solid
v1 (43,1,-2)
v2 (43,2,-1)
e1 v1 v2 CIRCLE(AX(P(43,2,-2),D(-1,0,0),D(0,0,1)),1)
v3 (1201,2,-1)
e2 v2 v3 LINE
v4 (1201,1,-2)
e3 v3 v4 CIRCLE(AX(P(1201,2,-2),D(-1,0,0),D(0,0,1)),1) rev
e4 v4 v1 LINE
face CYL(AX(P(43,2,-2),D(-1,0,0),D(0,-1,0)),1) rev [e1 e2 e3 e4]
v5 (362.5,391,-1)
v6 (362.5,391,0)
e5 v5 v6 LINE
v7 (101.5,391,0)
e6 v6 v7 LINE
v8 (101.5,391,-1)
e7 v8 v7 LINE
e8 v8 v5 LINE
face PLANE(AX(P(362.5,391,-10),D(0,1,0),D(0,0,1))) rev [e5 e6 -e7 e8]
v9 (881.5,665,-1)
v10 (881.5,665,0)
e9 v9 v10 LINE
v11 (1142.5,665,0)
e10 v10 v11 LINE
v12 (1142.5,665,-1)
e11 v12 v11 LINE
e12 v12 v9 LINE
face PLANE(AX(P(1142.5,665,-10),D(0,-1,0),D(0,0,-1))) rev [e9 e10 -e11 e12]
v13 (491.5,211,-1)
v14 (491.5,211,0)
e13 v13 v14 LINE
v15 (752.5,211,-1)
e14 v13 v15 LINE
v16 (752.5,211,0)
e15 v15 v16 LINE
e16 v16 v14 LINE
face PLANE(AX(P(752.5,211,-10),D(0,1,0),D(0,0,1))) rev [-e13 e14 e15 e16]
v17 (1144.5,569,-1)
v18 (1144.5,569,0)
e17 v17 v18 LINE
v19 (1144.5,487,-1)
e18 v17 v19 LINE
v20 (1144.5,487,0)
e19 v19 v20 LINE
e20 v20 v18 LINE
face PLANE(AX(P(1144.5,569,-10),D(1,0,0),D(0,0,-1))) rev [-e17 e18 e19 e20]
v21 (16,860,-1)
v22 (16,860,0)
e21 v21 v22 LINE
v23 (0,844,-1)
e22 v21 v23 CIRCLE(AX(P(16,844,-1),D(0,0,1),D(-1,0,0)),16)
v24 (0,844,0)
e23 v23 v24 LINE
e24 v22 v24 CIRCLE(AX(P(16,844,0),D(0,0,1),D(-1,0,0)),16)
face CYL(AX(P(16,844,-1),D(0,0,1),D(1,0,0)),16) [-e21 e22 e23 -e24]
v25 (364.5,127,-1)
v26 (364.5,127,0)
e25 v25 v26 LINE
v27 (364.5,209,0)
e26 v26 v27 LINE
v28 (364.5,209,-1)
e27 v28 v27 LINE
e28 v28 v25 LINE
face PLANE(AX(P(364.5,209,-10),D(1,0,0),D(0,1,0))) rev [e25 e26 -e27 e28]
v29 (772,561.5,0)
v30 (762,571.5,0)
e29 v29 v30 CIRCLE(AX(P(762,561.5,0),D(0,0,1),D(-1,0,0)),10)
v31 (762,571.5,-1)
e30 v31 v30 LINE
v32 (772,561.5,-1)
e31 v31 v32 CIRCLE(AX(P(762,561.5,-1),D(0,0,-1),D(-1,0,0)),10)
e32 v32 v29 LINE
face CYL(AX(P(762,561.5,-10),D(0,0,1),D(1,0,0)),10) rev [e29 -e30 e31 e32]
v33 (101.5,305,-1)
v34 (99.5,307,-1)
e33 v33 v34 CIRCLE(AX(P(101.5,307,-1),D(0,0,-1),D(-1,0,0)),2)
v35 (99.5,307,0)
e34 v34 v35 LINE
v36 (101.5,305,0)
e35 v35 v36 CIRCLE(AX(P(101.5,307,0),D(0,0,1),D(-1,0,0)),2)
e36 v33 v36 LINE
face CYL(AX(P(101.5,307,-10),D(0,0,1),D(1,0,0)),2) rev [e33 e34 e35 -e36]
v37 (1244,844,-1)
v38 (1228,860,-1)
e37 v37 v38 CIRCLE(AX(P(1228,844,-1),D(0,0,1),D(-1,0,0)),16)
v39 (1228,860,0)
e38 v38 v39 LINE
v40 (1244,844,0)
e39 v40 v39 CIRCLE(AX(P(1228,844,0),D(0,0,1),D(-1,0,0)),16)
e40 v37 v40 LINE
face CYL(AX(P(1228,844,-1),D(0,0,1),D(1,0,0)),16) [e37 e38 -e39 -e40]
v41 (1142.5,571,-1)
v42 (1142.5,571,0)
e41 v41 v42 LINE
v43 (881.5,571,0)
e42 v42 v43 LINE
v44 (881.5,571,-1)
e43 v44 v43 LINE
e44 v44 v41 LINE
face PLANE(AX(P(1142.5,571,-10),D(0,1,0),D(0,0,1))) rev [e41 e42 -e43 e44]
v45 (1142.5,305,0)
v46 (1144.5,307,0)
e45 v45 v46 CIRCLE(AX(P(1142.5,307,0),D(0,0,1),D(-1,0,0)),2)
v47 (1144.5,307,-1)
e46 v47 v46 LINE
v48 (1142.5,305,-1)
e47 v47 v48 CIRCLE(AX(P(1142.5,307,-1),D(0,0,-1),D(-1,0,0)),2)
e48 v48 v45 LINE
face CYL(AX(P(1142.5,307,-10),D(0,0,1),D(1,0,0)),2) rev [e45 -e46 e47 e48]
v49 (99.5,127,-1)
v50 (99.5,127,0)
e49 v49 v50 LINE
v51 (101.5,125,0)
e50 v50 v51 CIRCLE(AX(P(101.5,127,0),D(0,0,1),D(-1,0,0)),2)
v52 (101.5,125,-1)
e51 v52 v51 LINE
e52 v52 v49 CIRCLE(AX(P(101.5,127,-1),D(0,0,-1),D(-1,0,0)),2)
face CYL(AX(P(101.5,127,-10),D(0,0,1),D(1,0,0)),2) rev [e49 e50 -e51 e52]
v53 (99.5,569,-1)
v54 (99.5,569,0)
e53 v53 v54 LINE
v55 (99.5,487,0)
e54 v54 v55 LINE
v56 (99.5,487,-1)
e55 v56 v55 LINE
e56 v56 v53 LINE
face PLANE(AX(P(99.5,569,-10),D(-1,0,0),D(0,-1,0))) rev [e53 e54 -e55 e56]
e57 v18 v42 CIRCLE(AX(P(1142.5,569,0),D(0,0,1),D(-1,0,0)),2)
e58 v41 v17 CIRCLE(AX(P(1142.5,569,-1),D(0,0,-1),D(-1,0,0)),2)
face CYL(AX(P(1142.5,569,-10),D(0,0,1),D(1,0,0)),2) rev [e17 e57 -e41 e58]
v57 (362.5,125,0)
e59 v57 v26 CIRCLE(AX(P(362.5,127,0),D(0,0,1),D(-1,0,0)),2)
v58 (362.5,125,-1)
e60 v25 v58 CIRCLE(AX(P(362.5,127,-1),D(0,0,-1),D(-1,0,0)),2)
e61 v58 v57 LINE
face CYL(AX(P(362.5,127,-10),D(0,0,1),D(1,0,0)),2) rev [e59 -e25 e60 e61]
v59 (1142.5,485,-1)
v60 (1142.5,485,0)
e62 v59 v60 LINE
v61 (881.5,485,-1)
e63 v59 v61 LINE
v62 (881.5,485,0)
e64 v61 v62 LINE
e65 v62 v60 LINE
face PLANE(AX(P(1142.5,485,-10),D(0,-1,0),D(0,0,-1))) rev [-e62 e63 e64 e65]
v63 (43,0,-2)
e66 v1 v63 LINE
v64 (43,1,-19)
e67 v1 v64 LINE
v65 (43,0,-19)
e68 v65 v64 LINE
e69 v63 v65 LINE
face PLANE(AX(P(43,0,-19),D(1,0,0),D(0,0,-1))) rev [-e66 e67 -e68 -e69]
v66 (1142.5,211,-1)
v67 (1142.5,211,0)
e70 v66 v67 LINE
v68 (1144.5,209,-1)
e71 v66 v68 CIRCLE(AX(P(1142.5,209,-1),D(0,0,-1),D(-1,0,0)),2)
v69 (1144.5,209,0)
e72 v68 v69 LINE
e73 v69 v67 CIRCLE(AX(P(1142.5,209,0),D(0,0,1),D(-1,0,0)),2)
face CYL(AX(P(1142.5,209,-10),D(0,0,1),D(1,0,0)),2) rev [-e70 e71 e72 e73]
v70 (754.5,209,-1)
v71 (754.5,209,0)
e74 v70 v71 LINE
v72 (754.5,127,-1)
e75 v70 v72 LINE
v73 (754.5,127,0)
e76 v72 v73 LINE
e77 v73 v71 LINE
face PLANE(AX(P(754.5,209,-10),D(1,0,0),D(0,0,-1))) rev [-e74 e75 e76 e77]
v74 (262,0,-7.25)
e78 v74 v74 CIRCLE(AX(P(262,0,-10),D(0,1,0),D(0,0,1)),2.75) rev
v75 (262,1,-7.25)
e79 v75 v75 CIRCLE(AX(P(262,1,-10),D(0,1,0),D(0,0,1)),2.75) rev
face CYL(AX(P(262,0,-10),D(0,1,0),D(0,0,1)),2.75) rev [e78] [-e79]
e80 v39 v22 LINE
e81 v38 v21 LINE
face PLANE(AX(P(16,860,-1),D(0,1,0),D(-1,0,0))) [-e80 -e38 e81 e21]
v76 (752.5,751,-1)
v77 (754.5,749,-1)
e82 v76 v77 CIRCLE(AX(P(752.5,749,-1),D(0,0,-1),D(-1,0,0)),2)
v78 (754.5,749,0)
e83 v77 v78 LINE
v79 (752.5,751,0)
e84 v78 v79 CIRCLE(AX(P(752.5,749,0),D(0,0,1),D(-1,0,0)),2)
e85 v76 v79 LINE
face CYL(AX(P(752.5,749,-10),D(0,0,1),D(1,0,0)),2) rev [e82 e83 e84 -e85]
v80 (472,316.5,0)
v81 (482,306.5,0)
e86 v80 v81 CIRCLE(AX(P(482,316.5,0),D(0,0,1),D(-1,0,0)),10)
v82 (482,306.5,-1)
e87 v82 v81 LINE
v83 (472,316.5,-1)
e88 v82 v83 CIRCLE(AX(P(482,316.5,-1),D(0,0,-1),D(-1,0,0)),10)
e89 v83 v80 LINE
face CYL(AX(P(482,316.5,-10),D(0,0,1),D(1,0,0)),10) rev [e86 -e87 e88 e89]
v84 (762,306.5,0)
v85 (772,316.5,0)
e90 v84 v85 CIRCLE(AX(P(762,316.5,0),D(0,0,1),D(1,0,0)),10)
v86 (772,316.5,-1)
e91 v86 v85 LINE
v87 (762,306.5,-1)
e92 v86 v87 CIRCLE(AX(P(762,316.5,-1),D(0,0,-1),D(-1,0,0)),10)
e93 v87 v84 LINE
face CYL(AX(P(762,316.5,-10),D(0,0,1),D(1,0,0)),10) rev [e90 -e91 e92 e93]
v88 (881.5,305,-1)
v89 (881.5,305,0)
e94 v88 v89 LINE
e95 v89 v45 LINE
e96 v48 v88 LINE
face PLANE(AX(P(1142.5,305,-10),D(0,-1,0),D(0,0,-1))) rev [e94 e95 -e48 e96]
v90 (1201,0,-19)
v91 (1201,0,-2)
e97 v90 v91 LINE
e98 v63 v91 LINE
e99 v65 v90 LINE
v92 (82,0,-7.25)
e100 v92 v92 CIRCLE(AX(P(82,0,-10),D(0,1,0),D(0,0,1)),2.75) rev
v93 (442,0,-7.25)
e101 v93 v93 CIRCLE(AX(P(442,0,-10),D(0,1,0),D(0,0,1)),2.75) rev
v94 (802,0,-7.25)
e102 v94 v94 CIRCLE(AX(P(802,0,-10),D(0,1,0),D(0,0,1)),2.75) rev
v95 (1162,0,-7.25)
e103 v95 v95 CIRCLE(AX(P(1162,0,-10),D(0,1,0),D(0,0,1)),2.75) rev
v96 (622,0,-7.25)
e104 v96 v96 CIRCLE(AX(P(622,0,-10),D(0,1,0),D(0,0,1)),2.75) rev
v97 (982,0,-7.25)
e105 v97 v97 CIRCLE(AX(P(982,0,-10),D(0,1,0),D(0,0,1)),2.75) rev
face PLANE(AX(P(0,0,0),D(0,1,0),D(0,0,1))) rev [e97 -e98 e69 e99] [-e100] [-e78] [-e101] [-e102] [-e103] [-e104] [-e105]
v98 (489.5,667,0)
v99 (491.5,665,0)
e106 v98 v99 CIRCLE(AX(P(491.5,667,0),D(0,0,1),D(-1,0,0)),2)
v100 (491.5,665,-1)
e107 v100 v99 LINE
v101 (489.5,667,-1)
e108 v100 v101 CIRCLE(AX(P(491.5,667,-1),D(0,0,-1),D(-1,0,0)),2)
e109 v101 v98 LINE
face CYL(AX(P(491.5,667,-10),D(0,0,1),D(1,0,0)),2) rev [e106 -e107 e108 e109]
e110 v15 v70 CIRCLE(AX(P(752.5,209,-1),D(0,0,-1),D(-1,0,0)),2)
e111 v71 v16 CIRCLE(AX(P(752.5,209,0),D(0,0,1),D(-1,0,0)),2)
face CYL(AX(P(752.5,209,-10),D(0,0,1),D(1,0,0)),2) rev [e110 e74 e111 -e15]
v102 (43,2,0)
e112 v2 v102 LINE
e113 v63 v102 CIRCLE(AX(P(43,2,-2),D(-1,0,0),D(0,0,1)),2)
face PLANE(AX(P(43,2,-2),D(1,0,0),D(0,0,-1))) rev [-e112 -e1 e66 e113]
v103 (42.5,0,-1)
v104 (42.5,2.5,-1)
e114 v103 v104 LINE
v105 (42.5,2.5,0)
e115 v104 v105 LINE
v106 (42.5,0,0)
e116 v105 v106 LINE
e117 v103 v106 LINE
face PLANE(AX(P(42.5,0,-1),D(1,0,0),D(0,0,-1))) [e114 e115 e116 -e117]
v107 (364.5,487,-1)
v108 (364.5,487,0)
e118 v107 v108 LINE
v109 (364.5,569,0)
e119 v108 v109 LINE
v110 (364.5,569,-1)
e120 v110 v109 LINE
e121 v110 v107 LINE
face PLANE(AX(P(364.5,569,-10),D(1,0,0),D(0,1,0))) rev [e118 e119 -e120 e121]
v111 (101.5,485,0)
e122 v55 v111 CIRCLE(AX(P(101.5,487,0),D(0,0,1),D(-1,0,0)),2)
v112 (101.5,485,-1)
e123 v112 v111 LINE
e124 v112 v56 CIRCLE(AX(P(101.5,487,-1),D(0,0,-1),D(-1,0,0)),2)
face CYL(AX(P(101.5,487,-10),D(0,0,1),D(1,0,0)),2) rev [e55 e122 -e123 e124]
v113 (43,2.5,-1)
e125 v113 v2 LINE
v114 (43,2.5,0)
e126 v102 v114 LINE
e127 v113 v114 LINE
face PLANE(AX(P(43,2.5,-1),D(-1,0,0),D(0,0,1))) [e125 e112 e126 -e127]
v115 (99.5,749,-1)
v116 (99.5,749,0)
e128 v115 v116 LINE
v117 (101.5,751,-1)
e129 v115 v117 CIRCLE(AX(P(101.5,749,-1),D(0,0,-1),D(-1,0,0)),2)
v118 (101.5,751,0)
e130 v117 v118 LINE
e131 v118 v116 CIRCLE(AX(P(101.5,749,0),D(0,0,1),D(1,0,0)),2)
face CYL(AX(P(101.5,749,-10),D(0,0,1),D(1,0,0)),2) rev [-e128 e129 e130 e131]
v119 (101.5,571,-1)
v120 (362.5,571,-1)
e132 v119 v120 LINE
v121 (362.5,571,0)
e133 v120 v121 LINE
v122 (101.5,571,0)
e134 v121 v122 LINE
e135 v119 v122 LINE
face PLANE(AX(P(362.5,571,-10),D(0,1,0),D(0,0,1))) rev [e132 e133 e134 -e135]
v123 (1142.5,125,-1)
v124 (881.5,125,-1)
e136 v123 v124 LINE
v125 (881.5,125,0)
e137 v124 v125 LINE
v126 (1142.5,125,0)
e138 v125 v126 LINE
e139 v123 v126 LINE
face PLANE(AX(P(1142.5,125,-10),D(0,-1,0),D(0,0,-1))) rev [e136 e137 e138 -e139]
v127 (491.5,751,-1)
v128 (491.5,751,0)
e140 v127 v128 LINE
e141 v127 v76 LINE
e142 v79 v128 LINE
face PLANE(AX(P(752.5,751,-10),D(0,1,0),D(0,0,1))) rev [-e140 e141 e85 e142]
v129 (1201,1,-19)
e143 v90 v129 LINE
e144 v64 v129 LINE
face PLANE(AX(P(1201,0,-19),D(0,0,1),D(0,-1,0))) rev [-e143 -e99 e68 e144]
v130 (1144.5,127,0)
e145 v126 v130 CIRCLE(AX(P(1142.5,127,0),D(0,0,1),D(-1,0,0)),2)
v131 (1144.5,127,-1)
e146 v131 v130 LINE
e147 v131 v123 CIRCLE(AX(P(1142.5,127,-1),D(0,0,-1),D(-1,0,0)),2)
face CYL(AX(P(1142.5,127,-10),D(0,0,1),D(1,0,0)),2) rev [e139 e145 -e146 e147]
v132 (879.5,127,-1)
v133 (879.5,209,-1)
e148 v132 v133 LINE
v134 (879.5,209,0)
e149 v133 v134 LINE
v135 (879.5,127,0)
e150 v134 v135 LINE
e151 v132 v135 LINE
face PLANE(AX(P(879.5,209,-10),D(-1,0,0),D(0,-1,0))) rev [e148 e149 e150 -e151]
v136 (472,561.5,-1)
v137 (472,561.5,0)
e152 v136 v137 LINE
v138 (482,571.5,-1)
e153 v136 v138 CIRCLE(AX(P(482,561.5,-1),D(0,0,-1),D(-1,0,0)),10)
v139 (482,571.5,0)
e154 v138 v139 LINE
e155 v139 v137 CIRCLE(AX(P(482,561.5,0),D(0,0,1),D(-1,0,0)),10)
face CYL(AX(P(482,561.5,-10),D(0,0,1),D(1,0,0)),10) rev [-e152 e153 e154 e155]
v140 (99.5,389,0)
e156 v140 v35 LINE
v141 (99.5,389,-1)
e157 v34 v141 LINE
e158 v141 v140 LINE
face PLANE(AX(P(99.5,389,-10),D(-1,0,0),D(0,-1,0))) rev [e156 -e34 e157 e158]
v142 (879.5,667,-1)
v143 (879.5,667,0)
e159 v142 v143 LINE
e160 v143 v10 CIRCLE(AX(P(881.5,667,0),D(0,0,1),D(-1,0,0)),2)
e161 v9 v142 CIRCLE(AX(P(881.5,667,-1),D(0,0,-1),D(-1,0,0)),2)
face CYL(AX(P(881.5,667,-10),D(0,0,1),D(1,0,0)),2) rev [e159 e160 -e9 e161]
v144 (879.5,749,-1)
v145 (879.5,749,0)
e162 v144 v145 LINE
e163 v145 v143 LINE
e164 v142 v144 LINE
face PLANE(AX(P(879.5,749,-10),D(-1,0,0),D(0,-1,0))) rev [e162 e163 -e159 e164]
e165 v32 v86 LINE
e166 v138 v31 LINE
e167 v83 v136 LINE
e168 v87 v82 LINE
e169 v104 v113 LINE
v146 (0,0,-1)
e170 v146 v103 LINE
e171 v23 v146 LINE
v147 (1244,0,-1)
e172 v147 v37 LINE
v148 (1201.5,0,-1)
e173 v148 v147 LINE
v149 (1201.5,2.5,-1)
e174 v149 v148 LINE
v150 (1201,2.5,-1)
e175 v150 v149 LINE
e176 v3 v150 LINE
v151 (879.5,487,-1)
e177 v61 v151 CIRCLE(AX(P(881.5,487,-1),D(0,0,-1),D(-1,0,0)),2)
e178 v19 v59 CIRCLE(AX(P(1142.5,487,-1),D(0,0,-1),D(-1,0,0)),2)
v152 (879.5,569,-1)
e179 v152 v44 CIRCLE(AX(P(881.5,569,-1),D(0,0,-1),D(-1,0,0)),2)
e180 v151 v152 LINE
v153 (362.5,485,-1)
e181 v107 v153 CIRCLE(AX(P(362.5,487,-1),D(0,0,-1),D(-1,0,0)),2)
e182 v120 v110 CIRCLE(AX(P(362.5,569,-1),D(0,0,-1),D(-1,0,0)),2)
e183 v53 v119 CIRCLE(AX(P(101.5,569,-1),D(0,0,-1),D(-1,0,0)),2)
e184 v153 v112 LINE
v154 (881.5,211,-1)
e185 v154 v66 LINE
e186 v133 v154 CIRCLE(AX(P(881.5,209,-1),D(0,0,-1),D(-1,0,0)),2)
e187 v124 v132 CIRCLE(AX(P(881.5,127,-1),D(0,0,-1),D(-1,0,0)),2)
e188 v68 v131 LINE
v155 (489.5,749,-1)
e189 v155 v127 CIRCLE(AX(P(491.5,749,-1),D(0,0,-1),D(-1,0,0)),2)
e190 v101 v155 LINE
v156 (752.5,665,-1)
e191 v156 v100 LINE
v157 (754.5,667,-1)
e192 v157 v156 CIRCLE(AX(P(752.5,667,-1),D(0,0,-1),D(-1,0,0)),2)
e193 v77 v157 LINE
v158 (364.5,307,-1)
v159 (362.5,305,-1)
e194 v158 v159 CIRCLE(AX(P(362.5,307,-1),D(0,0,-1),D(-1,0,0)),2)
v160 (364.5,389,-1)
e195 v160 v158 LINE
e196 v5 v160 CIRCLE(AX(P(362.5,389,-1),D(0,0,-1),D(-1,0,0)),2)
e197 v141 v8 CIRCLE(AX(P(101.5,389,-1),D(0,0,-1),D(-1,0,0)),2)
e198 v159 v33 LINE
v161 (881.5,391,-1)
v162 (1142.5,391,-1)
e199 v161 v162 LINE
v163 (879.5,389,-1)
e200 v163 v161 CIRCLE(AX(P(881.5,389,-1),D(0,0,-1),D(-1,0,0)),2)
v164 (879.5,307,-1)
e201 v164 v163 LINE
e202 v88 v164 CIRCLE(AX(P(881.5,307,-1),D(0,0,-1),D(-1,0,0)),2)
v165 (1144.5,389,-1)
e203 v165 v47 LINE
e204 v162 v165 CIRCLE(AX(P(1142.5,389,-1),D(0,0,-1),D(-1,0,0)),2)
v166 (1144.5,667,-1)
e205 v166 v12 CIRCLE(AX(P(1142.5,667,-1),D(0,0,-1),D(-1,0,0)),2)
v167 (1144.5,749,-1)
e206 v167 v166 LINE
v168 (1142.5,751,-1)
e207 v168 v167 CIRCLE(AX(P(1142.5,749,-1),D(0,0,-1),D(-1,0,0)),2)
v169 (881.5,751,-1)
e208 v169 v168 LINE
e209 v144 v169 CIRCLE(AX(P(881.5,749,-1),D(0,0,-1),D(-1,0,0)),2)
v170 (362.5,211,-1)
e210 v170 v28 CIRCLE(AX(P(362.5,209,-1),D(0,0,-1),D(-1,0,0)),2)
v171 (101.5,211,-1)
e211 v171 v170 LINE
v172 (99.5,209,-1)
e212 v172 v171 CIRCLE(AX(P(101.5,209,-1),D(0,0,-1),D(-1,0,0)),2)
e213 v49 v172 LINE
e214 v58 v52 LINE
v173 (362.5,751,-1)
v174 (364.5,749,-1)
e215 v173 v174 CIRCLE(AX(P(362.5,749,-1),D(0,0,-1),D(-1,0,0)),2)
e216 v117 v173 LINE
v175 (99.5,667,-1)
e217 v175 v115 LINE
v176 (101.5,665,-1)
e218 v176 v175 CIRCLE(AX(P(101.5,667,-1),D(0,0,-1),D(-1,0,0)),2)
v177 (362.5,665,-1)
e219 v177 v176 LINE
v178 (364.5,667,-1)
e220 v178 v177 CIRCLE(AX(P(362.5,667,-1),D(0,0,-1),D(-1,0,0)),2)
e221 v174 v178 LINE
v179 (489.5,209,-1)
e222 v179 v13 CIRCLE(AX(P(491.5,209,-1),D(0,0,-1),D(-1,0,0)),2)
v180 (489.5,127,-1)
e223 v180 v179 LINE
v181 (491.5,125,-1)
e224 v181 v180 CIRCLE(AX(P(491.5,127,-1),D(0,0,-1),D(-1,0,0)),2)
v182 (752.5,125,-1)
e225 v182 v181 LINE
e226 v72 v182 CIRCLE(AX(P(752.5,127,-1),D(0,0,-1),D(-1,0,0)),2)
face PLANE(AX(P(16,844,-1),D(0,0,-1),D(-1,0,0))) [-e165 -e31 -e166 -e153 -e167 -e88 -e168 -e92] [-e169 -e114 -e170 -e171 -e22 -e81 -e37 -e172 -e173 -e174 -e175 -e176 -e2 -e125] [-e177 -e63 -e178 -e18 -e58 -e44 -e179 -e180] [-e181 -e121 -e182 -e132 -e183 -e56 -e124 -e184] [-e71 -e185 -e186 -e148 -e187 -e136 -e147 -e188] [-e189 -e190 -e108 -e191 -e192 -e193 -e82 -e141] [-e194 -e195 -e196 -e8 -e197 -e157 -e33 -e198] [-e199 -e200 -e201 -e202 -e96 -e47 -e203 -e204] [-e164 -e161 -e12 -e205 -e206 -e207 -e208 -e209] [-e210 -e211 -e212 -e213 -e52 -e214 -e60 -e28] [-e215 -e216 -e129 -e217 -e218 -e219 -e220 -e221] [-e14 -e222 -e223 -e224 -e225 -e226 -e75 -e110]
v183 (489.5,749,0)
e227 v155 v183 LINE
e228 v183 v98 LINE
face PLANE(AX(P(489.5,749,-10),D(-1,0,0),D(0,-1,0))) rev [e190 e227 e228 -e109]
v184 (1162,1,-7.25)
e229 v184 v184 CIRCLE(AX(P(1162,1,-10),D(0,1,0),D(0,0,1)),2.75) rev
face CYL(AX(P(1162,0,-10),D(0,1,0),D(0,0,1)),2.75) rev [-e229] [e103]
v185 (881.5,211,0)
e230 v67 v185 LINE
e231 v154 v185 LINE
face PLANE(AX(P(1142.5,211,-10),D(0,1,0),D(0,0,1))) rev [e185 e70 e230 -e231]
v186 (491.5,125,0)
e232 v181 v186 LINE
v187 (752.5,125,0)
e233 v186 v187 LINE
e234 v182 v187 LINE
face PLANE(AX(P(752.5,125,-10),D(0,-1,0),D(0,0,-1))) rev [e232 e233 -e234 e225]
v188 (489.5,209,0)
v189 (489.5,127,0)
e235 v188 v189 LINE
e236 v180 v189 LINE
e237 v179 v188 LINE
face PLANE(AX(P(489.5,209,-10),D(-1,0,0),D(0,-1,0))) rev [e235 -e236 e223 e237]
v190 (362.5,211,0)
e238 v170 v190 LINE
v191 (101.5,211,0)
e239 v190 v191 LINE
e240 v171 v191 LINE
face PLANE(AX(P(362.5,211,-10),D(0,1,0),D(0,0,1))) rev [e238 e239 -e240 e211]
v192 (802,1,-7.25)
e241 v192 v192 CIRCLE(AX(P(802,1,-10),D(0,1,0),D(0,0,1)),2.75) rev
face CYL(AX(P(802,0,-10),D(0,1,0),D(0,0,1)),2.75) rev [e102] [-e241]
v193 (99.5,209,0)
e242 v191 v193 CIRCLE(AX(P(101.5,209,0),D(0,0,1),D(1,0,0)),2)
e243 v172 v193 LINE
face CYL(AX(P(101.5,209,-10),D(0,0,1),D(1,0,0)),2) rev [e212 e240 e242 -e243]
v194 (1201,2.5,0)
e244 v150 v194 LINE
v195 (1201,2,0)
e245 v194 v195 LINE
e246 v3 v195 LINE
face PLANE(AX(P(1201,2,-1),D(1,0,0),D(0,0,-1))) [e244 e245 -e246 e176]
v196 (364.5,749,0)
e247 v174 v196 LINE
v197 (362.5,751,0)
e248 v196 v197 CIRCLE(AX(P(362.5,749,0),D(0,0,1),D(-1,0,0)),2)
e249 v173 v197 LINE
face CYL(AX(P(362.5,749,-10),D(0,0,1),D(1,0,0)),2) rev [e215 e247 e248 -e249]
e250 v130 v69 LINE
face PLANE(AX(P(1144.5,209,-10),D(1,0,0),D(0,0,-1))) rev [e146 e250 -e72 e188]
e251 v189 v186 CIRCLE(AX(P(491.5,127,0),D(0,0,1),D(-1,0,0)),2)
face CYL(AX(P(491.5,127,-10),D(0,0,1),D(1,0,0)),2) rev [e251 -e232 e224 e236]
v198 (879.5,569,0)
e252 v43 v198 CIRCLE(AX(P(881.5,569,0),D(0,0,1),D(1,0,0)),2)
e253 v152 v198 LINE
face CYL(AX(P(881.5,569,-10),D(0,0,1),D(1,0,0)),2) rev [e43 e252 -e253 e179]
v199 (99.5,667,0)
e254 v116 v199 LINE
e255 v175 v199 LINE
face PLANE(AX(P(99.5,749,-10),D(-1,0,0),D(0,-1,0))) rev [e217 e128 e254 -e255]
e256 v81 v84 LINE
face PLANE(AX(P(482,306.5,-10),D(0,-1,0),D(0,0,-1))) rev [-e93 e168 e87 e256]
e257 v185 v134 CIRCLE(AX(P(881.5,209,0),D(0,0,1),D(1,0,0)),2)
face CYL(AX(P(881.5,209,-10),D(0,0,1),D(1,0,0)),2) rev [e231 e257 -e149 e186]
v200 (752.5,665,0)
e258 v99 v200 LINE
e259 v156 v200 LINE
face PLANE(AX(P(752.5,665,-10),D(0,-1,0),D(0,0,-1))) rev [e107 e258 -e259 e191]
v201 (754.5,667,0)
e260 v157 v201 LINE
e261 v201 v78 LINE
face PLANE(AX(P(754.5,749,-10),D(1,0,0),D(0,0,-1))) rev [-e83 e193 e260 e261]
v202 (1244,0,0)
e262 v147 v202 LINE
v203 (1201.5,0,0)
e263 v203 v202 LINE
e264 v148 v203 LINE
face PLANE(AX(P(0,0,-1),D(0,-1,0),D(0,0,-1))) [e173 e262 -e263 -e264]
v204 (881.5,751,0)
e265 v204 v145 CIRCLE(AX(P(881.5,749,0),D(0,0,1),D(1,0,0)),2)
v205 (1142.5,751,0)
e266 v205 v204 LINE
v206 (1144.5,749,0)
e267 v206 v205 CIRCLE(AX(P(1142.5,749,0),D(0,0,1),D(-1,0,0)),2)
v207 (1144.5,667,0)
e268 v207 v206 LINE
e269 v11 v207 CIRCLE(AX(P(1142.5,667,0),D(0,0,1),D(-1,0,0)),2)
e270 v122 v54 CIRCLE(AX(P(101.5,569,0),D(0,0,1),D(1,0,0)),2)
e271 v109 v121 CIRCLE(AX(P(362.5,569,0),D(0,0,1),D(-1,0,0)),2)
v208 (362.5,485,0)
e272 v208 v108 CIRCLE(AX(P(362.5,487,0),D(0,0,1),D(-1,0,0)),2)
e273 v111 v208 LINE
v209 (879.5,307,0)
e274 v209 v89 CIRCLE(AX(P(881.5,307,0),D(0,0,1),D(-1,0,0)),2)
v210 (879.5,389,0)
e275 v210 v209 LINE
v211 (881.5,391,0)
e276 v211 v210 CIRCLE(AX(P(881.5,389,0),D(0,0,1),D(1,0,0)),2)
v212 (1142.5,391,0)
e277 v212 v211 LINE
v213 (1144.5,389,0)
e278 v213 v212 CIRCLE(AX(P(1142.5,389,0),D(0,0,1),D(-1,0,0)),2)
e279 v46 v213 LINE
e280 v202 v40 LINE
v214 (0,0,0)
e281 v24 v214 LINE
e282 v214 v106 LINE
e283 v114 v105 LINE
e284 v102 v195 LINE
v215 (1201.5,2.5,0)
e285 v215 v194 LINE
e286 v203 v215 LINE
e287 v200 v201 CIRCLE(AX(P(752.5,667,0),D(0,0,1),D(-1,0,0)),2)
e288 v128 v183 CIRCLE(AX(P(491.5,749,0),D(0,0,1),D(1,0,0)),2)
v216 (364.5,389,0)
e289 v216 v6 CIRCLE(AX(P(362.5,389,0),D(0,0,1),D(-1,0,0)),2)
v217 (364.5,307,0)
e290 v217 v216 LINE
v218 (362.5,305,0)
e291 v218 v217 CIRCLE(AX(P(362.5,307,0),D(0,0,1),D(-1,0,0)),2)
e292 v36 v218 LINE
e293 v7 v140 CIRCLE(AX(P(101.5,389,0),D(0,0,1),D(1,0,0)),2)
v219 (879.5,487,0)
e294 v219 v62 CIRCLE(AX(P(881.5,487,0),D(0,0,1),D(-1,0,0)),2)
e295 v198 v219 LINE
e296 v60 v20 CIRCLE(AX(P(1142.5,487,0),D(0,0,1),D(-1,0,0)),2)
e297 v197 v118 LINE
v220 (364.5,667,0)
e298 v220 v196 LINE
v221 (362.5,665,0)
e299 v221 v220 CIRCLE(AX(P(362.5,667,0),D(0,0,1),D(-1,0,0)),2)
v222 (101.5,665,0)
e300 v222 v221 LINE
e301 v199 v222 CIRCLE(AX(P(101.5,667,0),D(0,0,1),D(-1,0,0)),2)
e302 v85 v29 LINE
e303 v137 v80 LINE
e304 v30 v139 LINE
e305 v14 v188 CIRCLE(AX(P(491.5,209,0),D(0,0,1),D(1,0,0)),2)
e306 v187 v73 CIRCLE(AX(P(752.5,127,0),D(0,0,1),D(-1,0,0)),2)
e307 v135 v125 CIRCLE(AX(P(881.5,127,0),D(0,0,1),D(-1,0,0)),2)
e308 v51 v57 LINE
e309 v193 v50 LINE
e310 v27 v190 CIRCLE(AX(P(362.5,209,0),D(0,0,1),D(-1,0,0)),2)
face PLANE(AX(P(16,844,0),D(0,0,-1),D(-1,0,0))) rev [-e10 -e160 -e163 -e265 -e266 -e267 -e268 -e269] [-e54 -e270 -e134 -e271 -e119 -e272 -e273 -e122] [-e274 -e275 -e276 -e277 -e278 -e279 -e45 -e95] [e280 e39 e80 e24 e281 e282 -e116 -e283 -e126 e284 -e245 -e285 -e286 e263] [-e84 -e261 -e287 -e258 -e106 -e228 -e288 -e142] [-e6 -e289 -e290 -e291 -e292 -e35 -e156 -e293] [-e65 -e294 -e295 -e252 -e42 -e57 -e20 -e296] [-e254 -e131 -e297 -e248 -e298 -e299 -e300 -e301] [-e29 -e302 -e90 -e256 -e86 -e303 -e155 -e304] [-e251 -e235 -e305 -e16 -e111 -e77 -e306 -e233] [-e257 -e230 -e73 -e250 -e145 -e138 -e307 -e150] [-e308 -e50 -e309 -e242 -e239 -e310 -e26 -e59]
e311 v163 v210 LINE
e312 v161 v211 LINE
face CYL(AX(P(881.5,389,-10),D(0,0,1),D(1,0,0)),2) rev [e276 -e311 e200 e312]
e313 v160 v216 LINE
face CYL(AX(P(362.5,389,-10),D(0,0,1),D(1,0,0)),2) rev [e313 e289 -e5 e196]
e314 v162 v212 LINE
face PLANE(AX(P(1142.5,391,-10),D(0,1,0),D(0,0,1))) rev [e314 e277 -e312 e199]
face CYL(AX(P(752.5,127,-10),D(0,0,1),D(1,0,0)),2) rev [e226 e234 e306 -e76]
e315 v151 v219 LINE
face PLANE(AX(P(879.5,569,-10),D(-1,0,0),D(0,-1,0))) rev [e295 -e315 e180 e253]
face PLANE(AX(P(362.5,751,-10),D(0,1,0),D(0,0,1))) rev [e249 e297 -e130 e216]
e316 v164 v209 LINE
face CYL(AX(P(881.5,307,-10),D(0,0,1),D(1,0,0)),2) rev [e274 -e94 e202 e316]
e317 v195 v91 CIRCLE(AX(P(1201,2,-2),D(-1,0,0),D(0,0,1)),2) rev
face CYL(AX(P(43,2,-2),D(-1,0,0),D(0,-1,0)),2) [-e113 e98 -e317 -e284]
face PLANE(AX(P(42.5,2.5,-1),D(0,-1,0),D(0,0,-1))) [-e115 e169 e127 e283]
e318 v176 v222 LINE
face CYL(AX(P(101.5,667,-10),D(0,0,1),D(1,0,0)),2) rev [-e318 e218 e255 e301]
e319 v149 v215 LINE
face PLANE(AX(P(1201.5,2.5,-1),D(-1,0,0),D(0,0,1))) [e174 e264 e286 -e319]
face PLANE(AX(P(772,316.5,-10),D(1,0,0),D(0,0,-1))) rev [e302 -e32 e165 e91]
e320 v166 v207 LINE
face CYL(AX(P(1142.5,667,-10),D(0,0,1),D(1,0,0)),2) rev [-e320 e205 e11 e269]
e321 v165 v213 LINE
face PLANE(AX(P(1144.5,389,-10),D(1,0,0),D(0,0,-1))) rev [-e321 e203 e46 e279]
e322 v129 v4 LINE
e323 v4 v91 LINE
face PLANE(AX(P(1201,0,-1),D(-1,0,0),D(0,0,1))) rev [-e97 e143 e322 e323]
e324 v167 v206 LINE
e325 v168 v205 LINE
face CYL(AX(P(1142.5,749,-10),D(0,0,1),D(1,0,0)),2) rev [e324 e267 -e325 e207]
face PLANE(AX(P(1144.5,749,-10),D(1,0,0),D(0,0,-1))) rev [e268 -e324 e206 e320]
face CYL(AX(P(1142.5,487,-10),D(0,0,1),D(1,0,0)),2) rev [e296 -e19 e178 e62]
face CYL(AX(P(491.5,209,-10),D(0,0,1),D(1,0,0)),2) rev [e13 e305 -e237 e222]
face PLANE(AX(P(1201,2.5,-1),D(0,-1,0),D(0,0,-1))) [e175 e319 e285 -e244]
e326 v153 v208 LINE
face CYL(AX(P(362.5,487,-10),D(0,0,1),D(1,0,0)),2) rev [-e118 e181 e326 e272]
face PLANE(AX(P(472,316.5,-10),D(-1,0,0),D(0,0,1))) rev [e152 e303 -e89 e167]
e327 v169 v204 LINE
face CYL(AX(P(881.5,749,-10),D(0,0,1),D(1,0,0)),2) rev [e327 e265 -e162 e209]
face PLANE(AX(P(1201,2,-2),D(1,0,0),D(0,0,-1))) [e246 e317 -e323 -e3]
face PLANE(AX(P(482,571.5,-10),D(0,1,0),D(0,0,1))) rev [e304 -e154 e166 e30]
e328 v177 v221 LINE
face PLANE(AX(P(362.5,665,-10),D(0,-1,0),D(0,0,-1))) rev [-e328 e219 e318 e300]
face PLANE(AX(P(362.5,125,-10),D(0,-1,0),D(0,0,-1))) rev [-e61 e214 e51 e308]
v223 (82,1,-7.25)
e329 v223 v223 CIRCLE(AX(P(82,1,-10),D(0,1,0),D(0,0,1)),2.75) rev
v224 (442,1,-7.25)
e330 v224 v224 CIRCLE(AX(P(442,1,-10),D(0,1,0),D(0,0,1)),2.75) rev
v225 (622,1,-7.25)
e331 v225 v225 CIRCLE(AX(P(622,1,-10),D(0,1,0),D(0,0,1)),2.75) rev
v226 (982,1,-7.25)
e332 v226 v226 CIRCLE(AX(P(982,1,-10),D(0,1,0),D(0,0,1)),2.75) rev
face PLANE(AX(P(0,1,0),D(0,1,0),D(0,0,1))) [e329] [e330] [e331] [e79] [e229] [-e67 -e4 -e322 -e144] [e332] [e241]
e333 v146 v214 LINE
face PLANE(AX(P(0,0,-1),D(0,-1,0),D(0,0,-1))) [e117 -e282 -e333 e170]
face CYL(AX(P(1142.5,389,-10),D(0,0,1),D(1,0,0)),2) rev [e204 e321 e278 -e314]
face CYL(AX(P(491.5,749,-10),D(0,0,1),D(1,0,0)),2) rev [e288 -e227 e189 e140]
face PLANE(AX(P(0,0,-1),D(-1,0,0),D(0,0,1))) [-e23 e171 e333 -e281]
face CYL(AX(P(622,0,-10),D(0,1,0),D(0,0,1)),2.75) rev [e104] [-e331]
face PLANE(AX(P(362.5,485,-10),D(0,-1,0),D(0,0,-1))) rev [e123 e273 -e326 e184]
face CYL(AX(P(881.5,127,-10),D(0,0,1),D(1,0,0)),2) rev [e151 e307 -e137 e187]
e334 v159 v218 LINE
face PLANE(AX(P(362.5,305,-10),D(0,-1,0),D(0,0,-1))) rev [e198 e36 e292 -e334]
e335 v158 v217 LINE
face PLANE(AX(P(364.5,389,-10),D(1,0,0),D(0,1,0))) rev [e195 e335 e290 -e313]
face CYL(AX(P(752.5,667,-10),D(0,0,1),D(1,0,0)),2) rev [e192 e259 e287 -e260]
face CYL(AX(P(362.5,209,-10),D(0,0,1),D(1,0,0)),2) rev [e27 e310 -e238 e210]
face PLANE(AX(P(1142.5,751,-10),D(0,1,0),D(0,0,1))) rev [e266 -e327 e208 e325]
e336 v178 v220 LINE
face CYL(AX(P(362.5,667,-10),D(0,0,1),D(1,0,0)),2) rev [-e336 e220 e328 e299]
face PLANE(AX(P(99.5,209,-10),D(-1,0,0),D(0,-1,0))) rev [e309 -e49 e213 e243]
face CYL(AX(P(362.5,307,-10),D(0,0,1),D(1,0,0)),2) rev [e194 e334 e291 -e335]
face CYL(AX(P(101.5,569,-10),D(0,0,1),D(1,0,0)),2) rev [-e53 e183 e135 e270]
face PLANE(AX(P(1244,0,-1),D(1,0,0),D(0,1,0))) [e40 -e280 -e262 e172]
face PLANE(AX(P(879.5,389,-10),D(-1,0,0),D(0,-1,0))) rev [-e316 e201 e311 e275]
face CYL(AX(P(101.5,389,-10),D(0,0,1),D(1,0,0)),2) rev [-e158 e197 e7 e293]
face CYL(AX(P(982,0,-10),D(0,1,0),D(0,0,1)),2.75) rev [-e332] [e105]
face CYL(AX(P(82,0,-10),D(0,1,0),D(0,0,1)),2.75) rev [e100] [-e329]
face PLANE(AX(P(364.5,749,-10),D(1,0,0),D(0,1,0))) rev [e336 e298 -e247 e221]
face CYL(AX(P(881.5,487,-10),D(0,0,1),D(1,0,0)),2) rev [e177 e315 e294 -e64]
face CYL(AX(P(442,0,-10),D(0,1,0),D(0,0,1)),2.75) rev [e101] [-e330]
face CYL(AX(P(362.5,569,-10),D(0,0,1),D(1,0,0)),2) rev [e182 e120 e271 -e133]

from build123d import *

# Parameters (mm, degrees)
BASE_FLANGE1_DEPTH            = 1
EDGE_FLANGE1_STRIP_W          = 6
EDGE_FLANGE1_STRIP_H          = 1
EDGE_FLANGE1_STRIP_CUT_DEPTH  = 1158
EDGE_FLANGE1_RELIEF_W         = 6.5
EDGE_FLANGE1_RELIEF_H         = 0.5
EDGE_FLANGE1_RELIEF_CUT_DEPTH = 1
EDGE_FLANGE1_DEPTH            = 1158
EDGE_FLANGE1_PROFILE_W        = 1158
EDGE_FLANGE1_PROFILE_H        = 17
EDGE_FLANGE1_PROFILE_R        = 2.75
EDGE_FLANGE1_FLAT_DEPTH       = 1
CUT_EXTRUDE1_DEPTH            = 10
CUT_EXTRUDE2_DEPTH            = 10


# Sheet-metal steps are written as plain solids
with BuildPart() as part:
    # Sketch1 → Base-Flange1 (new body)
    with BuildSketch(Plane.XY):
        with BuildLine():
            Line((0, 0), (1244, 0))
            Line((1244, 0), (1244, 844))
            ThreePointArc((1244, 844), (1239.313708499, 855.313708499), (1228, 860))
            Line((1228, 860), (16, 860))
            ThreePointArc((16, 860), (4.686291501, 855.313708499), (0, 844))
            Line((0, 844), (0, 0))
        make_face()
    extrude(amount=-BASE_FLANGE1_DEPTH)

    # Edge-Flange1 strip (across the edge) → Edge-Flange1 strip cut (cut)
    with BuildSketch(Plane(origin=(1201, 0, -1), x_dir=(0, 1, 0), z_dir=(-1, 0, 0))):
        with Locations((-1, -0.5)):
            Rectangle(EDGE_FLANGE1_STRIP_W, EDGE_FLANGE1_STRIP_H)
    extrude(amount=EDGE_FLANGE1_STRIP_CUT_DEPTH, mode=Mode.SUBTRACT)

    # Edge-Flange1 relief (on the sheet) → Edge-Flange1 relief cut (cut)
    with BuildSketch(Plane(origin=(1201, 2, -1), x_dir=(0, 1, 0), z_dir=(0, 0, -1))):
        with Locations((-2.75, 0.25)):
            Rectangle(EDGE_FLANGE1_RELIEF_W, EDGE_FLANGE1_RELIEF_H)
        with Locations((-2.75, -1158.25)):
            Rectangle(EDGE_FLANGE1_RELIEF_W, EDGE_FLANGE1_RELIEF_H)
    extrude(amount=-EDGE_FLANGE1_RELIEF_CUT_DEPTH, mode=Mode.SUBTRACT)

    # Edge-Flange1 bend section (across the edge) → Edge-Flange1 (add)
    with BuildSketch(Plane(origin=(1201, 0, -1), x_dir=(0, 1, 0), z_dir=(-1, 0, 0))):
        with BuildLine():
            Line((0, 1), (1, 1))
            ThreePointArc((1, 1), (1.292893219, 0.292893219), (2, 0))
            Line((2, 0), (2, -1))
            ThreePointArc((2, -1), (0.585786438, -0.414213562), (0, 1))
        make_face()
    extrude(amount=EDGE_FLANGE1_DEPTH)

    # Edge-Flange1 profile (on flange) → Edge-Flange1 flat (add)
    with BuildSketch(Plane(origin=(0, 0, -1), x_dir=(-1, 0, 0), z_dir=(0, -1, 0))):
        with Locations((-622, 9.5)):
            Rectangle(EDGE_FLANGE1_PROFILE_W, EDGE_FLANGE1_PROFILE_H)
        with Locations((-802, 9)):
            Circle(EDGE_FLANGE1_PROFILE_R, mode=Mode.SUBTRACT)
        with Locations((-982, 9)):
            Circle(EDGE_FLANGE1_PROFILE_R, mode=Mode.SUBTRACT)
        with Locations((-1162, 9)):
            Circle(EDGE_FLANGE1_PROFILE_R, mode=Mode.SUBTRACT)
        with Locations((-82, 9)):
            Circle(EDGE_FLANGE1_PROFILE_R, mode=Mode.SUBTRACT)
        with Locations((-262, 9)):
            Circle(EDGE_FLANGE1_PROFILE_R, mode=Mode.SUBTRACT)
        with Locations((-442, 9)):
            Circle(EDGE_FLANGE1_PROFILE_R, mode=Mode.SUBTRACT)
        with Locations((-622, 9)):
            Circle(EDGE_FLANGE1_PROFILE_R, mode=Mode.SUBTRACT)
    extrude(amount=-EDGE_FLANGE1_FLAT_DEPTH)

    # Sketch9 → Cut-Extrude1 (cut)
    with BuildSketch(Plane.XY):
        with BuildLine():
            Line((1142.5, 751), (881.5, 751))
            ThreePointArc((881.5, 751), (880.085786438, 750.414213562), (879.5, 749))
            Line((879.5, 749), (879.5, 667))
            ThreePointArc((879.5, 667), (880.085786438, 665.585786438), (881.5, 665))
            Line((881.5, 665), (1142.5, 665))
            ThreePointArc((1142.5, 665), (1143.914213562, 665.585786438), (1144.5, 667))
            Line((1144.5, 667), (1144.5, 749))
            ThreePointArc((1144.5, 749), (1143.914213562, 750.414213562), (1142.5, 751))
        make_face()
        with BuildLine():
            Line((754.5, 749), (754.5, 667))
            ThreePointArc((754.5, 667), (753.914213562, 665.585786438), (752.5, 665))
            Line((752.5, 665), (491.5, 665))
            ThreePointArc((491.5, 665), (490.085786438, 665.585786438), (489.5, 667))
            Line((489.5, 667), (489.5, 749))
            ThreePointArc((489.5, 749), (490.085786438, 750.414213562), (491.5, 751))
            Line((491.5, 751), (752.5, 751))
            ThreePointArc((752.5, 751), (753.914213562, 750.414213562), (754.5, 749))
        make_face()
        with BuildLine():
            Line((364.5, 749), (364.5, 667))
            ThreePointArc((364.5, 667), (363.914213562, 665.585786438), (362.5, 665))
            Line((362.5, 665), (101.5, 665))
            ThreePointArc((101.5, 665), (100.085786438, 665.585786438), (99.5, 667))
            Line((99.5, 667), (99.5, 749))
            ThreePointArc((99.5, 749), (100.085786438, 750.414213562), (101.5, 751))
            Line((101.5, 751), (362.5, 751))
            ThreePointArc((362.5, 751), (363.914213562, 750.414213562), (364.5, 749))
        make_face()
        with BuildLine():
            Line((364.5, 569), (364.5, 487))
            ThreePointArc((364.5, 487), (363.914213562, 485.585786438), (362.5, 485))
            Line((362.5, 485), (101.5, 485))
            ThreePointArc((101.5, 485), (100.085786438, 485.585786438), (99.5, 487))
            Line((99.5, 487), (99.5, 569))
            ThreePointArc((99.5, 569), (100.085786438, 570.414213562), (101.5, 571))
            Line((101.5, 571), (362.5, 571))
            ThreePointArc((362.5, 571), (363.914213562, 570.414213562), (364.5, 569))
        make_face()
        with BuildLine():
            Line((364.5, 389), (364.5, 307))
            ThreePointArc((364.5, 307), (363.914213562, 305.585786438), (362.5, 305))
            Line((362.5, 305), (101.5, 305))
            ThreePointArc((101.5, 305), (100.085786438, 305.585786438), (99.5, 307))
            Line((99.5, 307), (99.5, 389))
            ThreePointArc((99.5, 389), (100.085786438, 390.414213562), (101.5, 391))
            Line((101.5, 391), (362.5, 391))
            ThreePointArc((362.5, 391), (363.914213562, 390.414213562), (364.5, 389))
        make_face()
        with BuildLine():
            Line((754.5, 209), (754.5, 127))
            ThreePointArc((754.5, 127), (753.914213562, 125.585786438), (752.5, 125))
            Line((752.5, 125), (491.5, 125))
            ThreePointArc((491.5, 125), (490.085786438, 125.585786438), (489.5, 127))
            Line((489.5, 127), (489.5, 209))
            ThreePointArc((489.5, 209), (490.085786438, 210.414213562), (491.5, 211))
            Line((491.5, 211), (752.5, 211))
            ThreePointArc((752.5, 211), (753.914213562, 210.414213562), (754.5, 209))
        make_face()
        with BuildLine():
            Line((364.5, 209), (364.5, 127))
            ThreePointArc((364.5, 127), (363.914213562, 125.585786438), (362.5, 125))
            Line((362.5, 125), (101.5, 125))
            ThreePointArc((101.5, 125), (100.085786438, 125.585786438), (99.5, 127))
            Line((99.5, 127), (99.5, 209))
            ThreePointArc((99.5, 209), (100.085786438, 210.414213562), (101.5, 211))
            Line((101.5, 211), (362.5, 211))
            ThreePointArc((362.5, 211), (363.914213562, 210.414213562), (364.5, 209))
        make_face()
        with BuildLine():
            Line((1144.5, 569), (1144.5, 487))
            ThreePointArc((1144.5, 487), (1143.914213562, 485.585786438), (1142.5, 485))
            Line((1142.5, 485), (881.5, 485))
            ThreePointArc((881.5, 485), (880.085786438, 485.585786438), (879.5, 487))
            Line((879.5, 487), (879.5, 569))
            ThreePointArc((879.5, 569), (880.085786438, 570.414213562), (881.5, 571))
            Line((881.5, 571), (1142.5, 571))
            ThreePointArc((1142.5, 571), (1143.914213562, 570.414213562), (1144.5, 569))
        make_face()
        with BuildLine():
            Line((1144.5, 389), (1144.5, 307))
            ThreePointArc((1144.5, 307), (1143.914213562, 305.585786438), (1142.5, 305))
            Line((1142.5, 305), (881.5, 305))
            ThreePointArc((881.5, 305), (880.085786438, 305.585786438), (879.5, 307))
            Line((879.5, 307), (879.5, 389))
            ThreePointArc((879.5, 389), (880.085786438, 390.414213562), (881.5, 391))
            Line((881.5, 391), (1142.5, 391))
            ThreePointArc((1142.5, 391), (1143.914213562, 390.414213562), (1144.5, 389))
        make_face()
        with BuildLine():
            Line((1144.5, 209), (1144.5, 127))
            ThreePointArc((1144.5, 127), (1143.914213562, 125.585786438), (1142.5, 125))
            Line((1142.5, 125), (881.5, 125))
            ThreePointArc((881.5, 125), (880.085786438, 125.585786438), (879.5, 127))
            Line((879.5, 127), (879.5, 209))
            ThreePointArc((879.5, 209), (880.085786438, 210.414213562), (881.5, 211))
            Line((881.5, 211), (1142.5, 211))
            ThreePointArc((1142.5, 211), (1143.914213562, 210.414213562), (1144.5, 209))
        make_face()
    extrude(amount=-CUT_EXTRUDE1_DEPTH, mode=Mode.SUBTRACT)

    # Sketch10 → Cut-Extrude2 (cut)
    with BuildSketch(Plane.XY):
        with BuildLine():
            Line((482, 306.5), (762, 306.5))
            ThreePointArc((762, 306.5), (769.071067812, 309.428932188), (772, 316.5))
            Line((772, 316.5), (772, 561.5))
            ThreePointArc((772, 561.5), (769.071067812, 568.571067812), (762, 571.5))
            Line((762, 571.5), (482, 571.5))
            ThreePointArc((482, 571.5), (474.928932188, 568.571067812), (472, 561.5))
            Line((472, 561.5), (472, 316.5))
            ThreePointArc((472, 316.5), (474.928932188, 309.428932188), (482, 306.5))
        make_face()
    extrude(amount=-CUT_EXTRUDE2_DEPTH, mode=Mode.SUBTRACT)


solid = part.part
